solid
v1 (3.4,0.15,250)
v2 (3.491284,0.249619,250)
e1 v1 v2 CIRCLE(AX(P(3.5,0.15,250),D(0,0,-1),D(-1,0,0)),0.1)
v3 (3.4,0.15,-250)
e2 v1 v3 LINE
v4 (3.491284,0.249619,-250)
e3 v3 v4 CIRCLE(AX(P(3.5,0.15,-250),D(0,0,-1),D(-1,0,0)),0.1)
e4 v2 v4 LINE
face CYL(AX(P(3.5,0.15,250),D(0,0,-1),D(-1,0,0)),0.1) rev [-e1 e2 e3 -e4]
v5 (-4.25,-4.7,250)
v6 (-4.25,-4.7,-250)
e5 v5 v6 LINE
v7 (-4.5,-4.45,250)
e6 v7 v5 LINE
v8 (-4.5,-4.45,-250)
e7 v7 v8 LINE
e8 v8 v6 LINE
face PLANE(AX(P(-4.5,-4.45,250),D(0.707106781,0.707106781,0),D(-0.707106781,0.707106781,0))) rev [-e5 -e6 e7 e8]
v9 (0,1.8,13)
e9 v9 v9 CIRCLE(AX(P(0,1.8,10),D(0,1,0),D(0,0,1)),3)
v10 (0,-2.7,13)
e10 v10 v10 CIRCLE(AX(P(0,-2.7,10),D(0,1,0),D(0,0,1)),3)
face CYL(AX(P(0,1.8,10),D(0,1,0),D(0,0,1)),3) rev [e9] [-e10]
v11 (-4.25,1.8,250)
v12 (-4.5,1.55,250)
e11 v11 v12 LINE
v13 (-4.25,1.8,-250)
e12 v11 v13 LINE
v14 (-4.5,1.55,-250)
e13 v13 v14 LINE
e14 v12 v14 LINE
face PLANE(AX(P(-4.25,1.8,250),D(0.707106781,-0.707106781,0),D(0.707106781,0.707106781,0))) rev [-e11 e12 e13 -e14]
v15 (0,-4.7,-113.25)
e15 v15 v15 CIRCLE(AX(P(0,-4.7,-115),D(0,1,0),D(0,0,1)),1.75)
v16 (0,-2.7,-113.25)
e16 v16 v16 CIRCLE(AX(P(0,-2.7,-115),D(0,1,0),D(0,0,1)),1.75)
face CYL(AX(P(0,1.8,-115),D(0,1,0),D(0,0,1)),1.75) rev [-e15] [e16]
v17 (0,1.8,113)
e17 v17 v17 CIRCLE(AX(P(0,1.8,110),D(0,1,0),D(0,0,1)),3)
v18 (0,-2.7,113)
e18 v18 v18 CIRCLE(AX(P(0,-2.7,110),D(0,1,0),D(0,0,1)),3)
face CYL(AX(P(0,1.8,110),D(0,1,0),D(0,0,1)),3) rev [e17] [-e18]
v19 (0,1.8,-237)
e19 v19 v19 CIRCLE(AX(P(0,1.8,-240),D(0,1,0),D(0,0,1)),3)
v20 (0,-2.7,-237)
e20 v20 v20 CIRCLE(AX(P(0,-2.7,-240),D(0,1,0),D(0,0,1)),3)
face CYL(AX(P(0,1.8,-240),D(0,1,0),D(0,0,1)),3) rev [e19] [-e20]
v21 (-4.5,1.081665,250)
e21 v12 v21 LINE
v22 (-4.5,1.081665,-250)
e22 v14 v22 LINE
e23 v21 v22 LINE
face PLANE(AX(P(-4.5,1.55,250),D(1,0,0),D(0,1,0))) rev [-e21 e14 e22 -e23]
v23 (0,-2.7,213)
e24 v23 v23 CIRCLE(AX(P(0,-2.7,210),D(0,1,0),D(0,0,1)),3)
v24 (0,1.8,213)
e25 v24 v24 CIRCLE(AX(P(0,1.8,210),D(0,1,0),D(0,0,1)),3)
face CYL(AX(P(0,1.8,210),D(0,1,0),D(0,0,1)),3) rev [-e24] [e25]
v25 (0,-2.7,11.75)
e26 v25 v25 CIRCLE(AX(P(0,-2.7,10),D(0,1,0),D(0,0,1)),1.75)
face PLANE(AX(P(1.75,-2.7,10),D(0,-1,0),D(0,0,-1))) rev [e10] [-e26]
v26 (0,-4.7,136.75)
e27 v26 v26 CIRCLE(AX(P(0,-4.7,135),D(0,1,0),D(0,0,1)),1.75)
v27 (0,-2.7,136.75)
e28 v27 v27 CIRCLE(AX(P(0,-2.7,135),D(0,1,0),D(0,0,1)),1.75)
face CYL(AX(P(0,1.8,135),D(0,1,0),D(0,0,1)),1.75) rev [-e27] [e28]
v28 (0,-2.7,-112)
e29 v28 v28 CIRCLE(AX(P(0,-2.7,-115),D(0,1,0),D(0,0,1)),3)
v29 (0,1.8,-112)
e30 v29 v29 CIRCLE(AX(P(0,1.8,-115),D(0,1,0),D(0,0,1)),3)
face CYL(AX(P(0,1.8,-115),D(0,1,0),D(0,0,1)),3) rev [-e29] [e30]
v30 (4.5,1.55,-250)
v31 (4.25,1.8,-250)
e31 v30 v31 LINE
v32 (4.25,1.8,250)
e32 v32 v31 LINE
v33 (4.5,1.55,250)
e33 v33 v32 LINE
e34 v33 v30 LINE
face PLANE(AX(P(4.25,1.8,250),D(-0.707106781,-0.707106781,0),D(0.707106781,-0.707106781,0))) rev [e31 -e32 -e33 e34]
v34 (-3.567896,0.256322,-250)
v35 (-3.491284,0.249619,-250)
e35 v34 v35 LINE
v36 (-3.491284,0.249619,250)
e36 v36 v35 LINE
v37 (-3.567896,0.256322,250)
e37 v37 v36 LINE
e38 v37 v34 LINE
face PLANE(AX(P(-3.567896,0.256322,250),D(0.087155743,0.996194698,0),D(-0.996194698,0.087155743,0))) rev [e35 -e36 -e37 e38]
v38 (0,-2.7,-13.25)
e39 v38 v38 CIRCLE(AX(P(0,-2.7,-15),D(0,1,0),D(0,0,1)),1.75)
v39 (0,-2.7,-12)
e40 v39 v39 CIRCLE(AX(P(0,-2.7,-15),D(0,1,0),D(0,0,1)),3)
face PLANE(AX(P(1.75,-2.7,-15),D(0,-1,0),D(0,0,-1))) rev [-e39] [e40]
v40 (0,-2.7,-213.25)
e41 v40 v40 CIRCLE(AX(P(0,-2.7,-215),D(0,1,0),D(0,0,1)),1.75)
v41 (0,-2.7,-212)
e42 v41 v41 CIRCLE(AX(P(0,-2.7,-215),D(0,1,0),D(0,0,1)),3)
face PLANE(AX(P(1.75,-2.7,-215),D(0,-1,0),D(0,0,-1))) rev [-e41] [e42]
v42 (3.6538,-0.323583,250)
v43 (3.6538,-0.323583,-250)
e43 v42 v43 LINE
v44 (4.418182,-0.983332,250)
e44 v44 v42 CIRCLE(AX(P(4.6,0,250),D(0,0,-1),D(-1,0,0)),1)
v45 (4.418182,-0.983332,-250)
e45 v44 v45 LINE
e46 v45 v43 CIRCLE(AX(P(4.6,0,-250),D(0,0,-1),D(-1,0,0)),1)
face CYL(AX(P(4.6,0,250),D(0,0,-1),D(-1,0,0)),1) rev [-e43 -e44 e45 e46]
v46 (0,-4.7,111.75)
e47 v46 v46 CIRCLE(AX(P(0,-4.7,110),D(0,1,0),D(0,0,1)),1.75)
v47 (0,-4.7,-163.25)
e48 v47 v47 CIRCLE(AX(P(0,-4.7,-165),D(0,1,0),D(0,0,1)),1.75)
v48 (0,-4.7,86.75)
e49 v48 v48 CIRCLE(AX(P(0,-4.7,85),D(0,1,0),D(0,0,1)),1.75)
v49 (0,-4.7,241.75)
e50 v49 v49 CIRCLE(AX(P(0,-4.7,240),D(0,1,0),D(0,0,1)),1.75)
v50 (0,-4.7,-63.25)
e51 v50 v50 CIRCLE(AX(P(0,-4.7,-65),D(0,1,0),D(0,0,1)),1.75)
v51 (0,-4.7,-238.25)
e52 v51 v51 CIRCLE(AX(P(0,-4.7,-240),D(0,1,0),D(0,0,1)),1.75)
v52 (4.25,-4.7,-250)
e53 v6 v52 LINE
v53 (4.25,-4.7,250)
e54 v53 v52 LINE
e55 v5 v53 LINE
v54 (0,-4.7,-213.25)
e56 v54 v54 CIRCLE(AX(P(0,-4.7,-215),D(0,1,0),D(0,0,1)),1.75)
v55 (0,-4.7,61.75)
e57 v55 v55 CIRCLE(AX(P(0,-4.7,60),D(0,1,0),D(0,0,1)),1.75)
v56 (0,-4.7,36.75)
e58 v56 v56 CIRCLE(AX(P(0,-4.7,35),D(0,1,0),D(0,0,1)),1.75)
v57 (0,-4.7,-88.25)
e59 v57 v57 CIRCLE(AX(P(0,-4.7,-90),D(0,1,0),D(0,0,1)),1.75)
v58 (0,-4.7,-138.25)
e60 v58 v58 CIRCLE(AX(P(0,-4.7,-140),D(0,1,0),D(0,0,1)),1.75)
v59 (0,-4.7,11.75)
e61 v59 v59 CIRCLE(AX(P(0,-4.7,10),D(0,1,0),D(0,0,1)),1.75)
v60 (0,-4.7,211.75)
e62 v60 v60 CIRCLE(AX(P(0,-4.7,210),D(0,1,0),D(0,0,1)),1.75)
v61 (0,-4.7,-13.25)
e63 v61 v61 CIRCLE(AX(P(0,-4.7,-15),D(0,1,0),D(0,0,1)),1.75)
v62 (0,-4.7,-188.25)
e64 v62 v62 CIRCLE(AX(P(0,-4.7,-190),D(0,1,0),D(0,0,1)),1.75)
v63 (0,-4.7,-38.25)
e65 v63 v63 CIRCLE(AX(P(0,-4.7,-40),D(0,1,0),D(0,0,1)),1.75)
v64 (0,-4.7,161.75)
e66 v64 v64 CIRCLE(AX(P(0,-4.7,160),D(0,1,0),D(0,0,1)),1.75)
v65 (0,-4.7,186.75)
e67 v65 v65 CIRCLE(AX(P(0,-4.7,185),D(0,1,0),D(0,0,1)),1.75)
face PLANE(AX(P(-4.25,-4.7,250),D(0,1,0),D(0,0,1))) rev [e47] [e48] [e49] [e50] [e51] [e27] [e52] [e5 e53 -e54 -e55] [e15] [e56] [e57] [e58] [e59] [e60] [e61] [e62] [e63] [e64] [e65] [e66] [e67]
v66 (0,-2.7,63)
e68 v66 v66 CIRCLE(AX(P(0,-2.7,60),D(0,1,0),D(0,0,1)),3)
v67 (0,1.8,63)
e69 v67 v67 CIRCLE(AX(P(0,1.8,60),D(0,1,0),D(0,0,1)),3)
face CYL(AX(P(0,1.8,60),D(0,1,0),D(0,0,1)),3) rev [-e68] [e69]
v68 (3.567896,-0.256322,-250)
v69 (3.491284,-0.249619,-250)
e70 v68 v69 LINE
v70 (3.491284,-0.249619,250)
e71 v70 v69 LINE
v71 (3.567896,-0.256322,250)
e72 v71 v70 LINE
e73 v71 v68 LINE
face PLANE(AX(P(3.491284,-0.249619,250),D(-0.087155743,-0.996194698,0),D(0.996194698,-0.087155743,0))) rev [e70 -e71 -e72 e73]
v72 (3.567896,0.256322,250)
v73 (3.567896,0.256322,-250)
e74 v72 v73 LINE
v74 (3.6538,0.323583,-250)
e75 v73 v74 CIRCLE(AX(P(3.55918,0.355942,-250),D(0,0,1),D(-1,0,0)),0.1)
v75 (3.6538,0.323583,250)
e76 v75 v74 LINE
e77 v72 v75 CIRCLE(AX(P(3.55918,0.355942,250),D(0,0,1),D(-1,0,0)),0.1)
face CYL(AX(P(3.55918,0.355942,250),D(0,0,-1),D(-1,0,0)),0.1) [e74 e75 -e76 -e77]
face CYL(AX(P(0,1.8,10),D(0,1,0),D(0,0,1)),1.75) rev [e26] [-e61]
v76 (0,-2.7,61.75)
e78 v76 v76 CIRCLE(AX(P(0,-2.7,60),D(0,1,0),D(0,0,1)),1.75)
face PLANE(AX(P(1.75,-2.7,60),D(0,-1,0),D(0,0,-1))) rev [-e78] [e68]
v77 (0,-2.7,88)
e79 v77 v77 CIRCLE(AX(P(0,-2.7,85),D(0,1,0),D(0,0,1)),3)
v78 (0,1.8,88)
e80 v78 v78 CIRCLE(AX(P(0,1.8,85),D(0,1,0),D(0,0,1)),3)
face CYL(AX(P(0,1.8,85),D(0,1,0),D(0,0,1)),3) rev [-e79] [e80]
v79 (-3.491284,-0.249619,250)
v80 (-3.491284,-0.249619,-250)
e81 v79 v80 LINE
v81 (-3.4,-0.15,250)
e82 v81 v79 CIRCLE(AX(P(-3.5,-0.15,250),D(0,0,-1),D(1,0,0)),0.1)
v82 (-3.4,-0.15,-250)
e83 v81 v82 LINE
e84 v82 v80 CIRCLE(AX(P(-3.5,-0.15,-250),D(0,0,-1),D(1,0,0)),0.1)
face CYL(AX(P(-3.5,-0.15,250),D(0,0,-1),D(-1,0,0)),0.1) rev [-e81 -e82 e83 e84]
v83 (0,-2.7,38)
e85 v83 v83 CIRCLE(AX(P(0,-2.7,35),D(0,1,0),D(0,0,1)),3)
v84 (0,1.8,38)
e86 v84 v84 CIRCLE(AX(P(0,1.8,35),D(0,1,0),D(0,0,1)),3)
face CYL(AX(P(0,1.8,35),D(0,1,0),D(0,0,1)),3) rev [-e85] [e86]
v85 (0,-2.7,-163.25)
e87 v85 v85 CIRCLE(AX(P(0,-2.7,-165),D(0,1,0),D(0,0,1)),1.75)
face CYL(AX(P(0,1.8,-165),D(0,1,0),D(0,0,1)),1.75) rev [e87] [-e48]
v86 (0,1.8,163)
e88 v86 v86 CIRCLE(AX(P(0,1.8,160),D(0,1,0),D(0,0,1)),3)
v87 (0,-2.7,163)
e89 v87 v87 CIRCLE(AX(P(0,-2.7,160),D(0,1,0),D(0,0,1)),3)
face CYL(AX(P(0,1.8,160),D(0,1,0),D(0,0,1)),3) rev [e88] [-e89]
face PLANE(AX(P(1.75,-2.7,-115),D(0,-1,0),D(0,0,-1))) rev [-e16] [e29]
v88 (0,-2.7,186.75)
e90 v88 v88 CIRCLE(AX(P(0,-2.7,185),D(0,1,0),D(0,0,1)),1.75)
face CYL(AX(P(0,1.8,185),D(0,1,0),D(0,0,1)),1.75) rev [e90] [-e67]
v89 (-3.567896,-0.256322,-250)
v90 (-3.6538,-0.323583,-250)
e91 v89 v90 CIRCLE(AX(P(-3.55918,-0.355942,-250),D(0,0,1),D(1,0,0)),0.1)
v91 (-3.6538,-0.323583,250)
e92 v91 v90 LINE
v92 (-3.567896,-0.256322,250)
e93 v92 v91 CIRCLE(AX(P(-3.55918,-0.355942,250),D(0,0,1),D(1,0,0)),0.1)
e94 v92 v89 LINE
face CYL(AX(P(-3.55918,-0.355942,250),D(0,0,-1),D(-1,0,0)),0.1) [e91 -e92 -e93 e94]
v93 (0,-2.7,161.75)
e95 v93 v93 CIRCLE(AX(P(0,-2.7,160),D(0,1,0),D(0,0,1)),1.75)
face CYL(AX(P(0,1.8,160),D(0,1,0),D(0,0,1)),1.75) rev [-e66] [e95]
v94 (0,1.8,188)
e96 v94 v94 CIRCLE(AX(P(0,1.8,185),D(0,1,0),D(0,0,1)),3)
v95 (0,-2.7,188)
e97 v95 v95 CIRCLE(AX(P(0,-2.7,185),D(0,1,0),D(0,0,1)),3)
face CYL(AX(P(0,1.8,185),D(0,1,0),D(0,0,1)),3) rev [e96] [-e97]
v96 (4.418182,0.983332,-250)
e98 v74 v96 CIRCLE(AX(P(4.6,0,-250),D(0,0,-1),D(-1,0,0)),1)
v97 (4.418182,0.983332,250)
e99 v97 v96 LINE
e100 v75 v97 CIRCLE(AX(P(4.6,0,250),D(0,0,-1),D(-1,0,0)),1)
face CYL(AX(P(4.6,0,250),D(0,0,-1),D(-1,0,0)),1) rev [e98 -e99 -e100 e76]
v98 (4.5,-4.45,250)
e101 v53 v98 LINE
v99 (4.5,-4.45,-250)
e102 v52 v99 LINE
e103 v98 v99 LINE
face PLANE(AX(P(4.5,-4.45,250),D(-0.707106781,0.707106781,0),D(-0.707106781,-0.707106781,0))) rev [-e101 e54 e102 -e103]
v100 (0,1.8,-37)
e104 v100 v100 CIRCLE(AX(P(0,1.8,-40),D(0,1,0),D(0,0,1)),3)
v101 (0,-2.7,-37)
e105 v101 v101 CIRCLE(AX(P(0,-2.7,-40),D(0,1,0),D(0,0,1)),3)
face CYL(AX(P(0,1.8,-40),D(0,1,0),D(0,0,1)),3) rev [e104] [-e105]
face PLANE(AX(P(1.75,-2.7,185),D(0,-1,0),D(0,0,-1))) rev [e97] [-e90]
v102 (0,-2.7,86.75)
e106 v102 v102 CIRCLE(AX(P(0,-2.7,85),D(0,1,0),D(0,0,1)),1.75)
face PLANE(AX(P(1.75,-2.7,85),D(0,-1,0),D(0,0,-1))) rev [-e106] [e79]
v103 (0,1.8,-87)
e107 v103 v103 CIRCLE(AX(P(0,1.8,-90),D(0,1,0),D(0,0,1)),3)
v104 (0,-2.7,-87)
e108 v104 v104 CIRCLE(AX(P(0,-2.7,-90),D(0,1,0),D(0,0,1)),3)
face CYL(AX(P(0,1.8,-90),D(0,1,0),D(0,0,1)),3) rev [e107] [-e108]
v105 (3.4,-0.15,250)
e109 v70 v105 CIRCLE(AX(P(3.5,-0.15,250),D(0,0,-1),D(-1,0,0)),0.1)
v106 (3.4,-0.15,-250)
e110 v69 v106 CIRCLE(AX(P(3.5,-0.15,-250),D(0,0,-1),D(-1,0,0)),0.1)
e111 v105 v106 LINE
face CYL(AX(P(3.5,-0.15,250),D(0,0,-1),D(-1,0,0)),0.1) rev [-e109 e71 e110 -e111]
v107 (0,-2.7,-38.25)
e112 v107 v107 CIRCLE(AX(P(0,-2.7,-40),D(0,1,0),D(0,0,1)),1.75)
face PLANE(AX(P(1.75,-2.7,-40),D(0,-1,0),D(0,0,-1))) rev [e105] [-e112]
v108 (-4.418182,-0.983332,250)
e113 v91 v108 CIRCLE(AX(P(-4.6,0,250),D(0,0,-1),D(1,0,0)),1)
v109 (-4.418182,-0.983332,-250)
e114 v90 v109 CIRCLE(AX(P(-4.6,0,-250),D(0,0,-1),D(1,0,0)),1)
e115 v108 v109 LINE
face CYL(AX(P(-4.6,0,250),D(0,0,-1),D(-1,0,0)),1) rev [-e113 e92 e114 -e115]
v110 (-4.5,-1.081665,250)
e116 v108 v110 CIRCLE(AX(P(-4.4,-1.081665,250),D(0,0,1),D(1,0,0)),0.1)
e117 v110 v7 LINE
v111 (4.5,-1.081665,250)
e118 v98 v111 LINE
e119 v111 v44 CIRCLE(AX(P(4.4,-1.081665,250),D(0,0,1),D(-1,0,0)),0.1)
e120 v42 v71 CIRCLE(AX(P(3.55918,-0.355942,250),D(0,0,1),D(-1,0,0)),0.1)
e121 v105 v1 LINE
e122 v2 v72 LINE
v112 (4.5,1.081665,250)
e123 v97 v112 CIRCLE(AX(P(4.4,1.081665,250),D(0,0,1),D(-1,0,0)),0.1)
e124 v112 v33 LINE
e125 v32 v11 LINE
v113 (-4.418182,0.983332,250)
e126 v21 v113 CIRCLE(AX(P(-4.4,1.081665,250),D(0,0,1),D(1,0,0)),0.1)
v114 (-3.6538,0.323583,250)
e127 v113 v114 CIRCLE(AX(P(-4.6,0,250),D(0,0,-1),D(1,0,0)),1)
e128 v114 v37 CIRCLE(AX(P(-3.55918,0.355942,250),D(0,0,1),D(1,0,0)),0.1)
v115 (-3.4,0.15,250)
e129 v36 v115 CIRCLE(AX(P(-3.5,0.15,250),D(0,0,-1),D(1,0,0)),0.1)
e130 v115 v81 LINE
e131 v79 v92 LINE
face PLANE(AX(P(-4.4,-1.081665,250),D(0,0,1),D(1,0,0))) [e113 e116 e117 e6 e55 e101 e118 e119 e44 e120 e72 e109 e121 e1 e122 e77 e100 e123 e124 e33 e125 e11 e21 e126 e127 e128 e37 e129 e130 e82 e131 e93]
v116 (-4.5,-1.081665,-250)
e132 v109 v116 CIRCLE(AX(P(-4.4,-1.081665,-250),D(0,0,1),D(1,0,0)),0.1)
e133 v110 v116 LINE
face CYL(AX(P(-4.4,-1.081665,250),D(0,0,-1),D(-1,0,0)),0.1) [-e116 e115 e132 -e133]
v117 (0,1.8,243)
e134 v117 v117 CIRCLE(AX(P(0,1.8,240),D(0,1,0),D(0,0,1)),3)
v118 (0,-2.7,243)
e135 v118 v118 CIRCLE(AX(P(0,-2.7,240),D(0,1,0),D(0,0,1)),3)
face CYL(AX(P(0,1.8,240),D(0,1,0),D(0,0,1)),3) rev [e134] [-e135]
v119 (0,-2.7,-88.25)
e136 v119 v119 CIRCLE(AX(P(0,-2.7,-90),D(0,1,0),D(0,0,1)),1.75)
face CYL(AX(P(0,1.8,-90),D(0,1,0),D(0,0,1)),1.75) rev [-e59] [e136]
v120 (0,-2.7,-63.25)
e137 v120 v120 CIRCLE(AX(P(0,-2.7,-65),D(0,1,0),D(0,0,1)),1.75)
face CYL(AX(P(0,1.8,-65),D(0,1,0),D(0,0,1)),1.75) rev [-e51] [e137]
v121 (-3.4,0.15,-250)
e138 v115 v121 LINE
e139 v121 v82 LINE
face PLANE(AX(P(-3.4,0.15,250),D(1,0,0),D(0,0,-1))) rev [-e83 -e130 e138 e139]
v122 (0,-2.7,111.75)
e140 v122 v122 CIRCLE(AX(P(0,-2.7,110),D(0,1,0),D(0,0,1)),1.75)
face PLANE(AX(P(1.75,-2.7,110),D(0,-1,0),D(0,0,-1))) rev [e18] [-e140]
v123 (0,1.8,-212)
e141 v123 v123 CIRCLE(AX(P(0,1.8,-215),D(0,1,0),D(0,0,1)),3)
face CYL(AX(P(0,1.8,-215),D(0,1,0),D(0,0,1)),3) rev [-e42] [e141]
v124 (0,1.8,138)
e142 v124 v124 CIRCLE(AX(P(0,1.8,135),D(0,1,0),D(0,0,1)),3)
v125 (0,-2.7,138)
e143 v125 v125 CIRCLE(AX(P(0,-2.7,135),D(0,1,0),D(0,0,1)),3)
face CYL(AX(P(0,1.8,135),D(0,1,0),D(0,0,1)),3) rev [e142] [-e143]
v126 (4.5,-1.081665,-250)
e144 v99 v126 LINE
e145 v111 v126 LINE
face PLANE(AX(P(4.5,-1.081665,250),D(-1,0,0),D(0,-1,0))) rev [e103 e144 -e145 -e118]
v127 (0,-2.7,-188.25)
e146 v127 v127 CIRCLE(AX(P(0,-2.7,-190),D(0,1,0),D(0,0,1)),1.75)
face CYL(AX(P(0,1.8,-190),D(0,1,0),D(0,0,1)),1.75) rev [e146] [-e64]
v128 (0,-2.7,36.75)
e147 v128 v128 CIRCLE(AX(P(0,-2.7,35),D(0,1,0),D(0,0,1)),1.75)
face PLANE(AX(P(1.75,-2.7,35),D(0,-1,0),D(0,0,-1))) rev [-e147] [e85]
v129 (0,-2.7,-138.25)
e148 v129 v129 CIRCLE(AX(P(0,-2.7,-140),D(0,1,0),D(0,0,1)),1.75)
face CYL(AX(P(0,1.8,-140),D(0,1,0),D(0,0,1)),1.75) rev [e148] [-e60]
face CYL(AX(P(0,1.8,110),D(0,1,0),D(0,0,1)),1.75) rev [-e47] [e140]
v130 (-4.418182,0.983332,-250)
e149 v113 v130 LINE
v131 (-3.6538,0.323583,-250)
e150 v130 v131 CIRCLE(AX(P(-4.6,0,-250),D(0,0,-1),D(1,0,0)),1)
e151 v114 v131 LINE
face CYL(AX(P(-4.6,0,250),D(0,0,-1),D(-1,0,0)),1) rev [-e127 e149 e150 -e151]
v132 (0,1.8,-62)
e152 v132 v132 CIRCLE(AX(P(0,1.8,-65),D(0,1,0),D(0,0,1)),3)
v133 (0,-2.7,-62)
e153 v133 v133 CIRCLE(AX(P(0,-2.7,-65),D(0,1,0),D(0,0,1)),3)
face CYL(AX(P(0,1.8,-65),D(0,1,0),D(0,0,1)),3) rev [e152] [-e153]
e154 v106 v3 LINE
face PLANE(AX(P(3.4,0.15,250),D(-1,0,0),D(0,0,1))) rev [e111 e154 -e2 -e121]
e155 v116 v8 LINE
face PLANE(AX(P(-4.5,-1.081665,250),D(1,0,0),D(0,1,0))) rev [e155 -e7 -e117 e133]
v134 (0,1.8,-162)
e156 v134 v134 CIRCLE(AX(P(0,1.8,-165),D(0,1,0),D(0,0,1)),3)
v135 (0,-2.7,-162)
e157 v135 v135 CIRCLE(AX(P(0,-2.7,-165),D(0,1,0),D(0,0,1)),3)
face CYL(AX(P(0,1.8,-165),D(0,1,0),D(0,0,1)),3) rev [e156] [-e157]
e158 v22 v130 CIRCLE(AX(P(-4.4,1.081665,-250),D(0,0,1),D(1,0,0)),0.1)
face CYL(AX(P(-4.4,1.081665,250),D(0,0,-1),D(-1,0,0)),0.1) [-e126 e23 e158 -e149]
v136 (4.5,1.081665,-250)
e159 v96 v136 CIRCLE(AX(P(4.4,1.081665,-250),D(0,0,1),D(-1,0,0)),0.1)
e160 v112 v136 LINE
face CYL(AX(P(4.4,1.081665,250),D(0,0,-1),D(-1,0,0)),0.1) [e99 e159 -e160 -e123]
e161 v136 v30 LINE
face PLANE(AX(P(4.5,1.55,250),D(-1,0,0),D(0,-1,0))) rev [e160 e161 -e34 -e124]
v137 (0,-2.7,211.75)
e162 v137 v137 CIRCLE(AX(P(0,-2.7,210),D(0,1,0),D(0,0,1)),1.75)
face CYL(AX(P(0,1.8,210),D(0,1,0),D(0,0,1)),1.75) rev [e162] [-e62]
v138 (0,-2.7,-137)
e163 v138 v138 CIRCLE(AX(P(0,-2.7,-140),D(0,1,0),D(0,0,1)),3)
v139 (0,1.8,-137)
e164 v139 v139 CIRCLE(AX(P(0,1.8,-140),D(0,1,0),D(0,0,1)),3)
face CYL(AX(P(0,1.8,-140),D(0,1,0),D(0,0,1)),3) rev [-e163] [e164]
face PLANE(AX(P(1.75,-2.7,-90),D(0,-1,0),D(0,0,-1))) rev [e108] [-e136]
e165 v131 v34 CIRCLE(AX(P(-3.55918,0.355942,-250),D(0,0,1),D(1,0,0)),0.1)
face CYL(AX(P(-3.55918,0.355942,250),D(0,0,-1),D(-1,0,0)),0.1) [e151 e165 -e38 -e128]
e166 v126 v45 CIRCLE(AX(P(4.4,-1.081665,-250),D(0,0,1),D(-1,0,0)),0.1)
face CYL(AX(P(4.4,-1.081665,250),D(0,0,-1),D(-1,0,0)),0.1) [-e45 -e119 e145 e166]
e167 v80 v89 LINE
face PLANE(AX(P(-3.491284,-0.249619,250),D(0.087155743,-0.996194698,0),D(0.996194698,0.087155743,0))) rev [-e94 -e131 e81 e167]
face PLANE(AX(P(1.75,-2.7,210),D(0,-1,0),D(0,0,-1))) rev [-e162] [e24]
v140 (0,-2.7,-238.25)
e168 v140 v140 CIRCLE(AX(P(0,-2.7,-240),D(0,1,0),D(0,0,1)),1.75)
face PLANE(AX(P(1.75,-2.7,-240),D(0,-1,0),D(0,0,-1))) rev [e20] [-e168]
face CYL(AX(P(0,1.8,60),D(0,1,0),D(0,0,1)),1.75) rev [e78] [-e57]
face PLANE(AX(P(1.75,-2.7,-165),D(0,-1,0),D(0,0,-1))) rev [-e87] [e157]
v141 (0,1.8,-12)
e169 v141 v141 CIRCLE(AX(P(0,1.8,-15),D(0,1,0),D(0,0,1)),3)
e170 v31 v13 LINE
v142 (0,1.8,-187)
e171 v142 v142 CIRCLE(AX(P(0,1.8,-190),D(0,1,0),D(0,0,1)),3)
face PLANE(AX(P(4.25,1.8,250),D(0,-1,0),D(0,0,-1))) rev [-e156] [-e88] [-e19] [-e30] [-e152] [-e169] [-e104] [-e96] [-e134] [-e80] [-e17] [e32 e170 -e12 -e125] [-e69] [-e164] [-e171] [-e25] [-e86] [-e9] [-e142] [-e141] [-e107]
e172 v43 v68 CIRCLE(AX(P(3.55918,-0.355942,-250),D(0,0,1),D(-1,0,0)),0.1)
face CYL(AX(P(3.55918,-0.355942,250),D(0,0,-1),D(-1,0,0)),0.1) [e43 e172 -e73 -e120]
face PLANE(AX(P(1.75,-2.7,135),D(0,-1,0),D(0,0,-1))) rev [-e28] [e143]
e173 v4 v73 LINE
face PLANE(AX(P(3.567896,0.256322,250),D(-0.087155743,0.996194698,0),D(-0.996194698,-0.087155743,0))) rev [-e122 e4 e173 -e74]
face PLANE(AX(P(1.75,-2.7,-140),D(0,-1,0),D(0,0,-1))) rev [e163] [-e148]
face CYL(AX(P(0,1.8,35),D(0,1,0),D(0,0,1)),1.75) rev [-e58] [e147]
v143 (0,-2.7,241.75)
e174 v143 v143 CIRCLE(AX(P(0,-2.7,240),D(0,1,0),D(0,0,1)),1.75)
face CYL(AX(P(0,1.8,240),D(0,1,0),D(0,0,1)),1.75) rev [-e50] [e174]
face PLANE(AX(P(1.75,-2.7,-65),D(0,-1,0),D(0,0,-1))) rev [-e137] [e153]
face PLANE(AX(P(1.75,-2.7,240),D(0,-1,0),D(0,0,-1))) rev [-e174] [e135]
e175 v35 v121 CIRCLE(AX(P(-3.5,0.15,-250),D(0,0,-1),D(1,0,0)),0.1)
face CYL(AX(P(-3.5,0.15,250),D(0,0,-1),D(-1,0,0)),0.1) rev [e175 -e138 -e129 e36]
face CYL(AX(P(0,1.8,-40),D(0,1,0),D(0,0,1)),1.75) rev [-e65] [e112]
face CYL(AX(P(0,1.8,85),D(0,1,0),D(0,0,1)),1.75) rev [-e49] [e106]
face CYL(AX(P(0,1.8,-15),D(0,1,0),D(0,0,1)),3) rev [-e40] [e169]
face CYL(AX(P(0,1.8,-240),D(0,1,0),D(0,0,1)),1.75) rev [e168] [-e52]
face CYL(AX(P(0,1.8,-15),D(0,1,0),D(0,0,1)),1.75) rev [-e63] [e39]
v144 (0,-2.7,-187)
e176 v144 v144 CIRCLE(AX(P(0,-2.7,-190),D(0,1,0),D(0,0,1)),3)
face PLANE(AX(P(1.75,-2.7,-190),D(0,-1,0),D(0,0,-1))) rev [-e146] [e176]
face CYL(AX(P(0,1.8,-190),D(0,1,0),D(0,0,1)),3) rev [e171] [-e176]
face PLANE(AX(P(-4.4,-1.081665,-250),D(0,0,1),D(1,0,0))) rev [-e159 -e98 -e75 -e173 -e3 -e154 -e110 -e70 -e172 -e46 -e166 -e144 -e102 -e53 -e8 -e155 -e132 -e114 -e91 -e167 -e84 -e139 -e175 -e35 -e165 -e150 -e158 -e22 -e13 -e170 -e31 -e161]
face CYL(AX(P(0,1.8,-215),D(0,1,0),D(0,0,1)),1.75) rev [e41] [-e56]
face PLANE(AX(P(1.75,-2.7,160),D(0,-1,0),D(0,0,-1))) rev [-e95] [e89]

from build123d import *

# Parameters (mm, degrees)
RAIL_PROFILE_DEPTH             = 250
CBORE_FOR_M3_SHCS1_D           = 3.5
CBORE_FOR_M3_SHCS1_CBORE_D     = 6
CBORE_FOR_M3_SHCS1_CBORE_DEPTH = 4.5
FILL_START                     = -2.7
FILL_PATTERN1_OUTLINE_R        = 3
FILL_PATTERN1_DEPTH            = 4.5
FILL_START_2                   = -4.7
FILL_PATTERN1_2_OUTLINE_R      = 1.75
FILL_PATTERN1_2_DEPTH          = 2


# Read off the part's stored shape, not the designer's step: Fill Pattern1
with BuildPart() as part:
    # Sketch1 → RAIL PROFILE (new, symmetric)
    with BuildSketch(Plane.XY):
        with BuildLine():
            Line((-4.5, -1.081665383), (-4.5, -4.45))
            Line((-4.5, -4.45), (-4.25, -4.7))
            Line((-4.25, -4.7), (4.25, -4.7))
            Line((4.25, -4.7), (4.5, -4.45))
            Line((4.5, -4.45), (4.5, -1.081665383))
            ThreePointArc((4.5, -1.081665383), (4.476870611, -1.017705168), (4.418181818, -0.983332166))
            ThreePointArc((4.418181818, -0.983332166), (3.946606362, -0.757018331), (3.653800296, -0.32358325))
            ThreePointArc((3.653800296, -0.32358325), (3.620829122, -0.277205142), (3.5678959, -0.256322105))
            Line((3.5678959, -0.256322105), (3.491284426, -0.24961947))
            ThreePointArc((3.491284426, -0.24961947), (3.426272266, -0.217559021), (3.4, -0.15))
            Line((3.4, -0.15), (3.4, 0.15))
            ThreePointArc((3.4, 0.15), (3.426272266, 0.217559021), (3.491284426, 0.24961947))
            Line((3.491284426, 0.24961947), (3.5678959, 0.256322105))
            ThreePointArc((3.5678959, 0.256322105), (3.620829122, 0.277205142), (3.653800296, 0.32358325))
            ThreePointArc((3.653800296, 0.32358325), (3.946606362, 0.757018331), (4.418181818, 0.983332166))
            ThreePointArc((4.418181818, 0.983332166), (4.476870611, 1.017705168), (4.5, 1.081665383))
            Line((4.5, 1.081665383), (4.5, 1.55))
            Line((4.5, 1.55), (4.25, 1.8))
            Line((4.25, 1.8), (-4.25, 1.8))
            Line((-4.25, 1.8), (-4.5, 1.55))
            Line((-4.5, 1.55), (-4.5, 1.081665383))
            ThreePointArc((-4.5, 1.081665383), (-4.476870611, 1.017705168), (-4.418181818, 0.983332166))
            ThreePointArc((-4.418181818, 0.983332166), (-3.946606362, 0.757018331), (-3.653800296, 0.32358325))
            ThreePointArc((-3.653800296, 0.32358325), (-3.620829122, 0.277205142), (-3.5678959, 0.256322105))
            Line((-3.5678959, 0.256322105), (-3.491284426, 0.24961947))
            ThreePointArc((-3.491284426, 0.24961947), (-3.426272266, 0.217559021), (-3.4, 0.15))
            Line((-3.4, 0.15), (-3.4, -0.15))
            ThreePointArc((-3.4, -0.15), (-3.426272266, -0.217559021), (-3.491284426, -0.24961947))
            Line((-3.491284426, -0.24961947), (-3.5678959, -0.256322105))
            ThreePointArc((-3.5678959, -0.256322105), (-3.620829122, -0.277205142), (-3.653800296, -0.32358325))
            ThreePointArc((-3.653800296, -0.32358325), (-3.946606362, -0.757018331), (-4.418181818, -0.983332166))
            ThreePointArc((-4.418181818, -0.983332166), (-4.476870611, -1.017705168), (-4.5, -1.081665383))
        make_face()
    extrude(amount=RAIL_PROFILE_DEPTH, both=True)

    # CBORE for M3 SHCS1 (through all)
    with Locations(Plane(origin=(0, 1.8, 0), x_dir=(1, 0, 0), z_dir=(0, 1, 0))):
        with Locations((0, 240)):
            cbore_for_m3_shcs1 = CounterBoreHole(CBORE_FOR_M3_SHCS1_D / 2, CBORE_FOR_M3_SHCS1_CBORE_D / 2, CBORE_FOR_M3_SHCS1_CBORE_DEPTH)

    # M3 END MIRROR: CBORE for M3 SHCS1 across plane
    add(cbore_for_m3_shcs1.mirror(Plane.XY), mode=Mode.SUBTRACT)

    # Fill Pattern1 outline → Fill Pattern1 (cut)
    with BuildSketch(Plane(origin=(0, 0, 0), x_dir=(1, 0, 0), z_dir=(0, 1, 0)).offset(FILL_START)):
        with Locations((0, 215)):
            Circle(FILL_PATTERN1_OUTLINE_R)
        with Locations((0, 190)):
            Circle(FILL_PATTERN1_OUTLINE_R)
        with Locations((0, 165)):
            Circle(FILL_PATTERN1_OUTLINE_R)
        with Locations((0, 140)):
            Circle(FILL_PATTERN1_OUTLINE_R)
        with Locations((0, 115)):
            Circle(FILL_PATTERN1_OUTLINE_R)
        with Locations((0, 90)):
            Circle(FILL_PATTERN1_OUTLINE_R)
        with Locations((0, 65)):
            Circle(FILL_PATTERN1_OUTLINE_R)
        with Locations((0, 40)):
            Circle(FILL_PATTERN1_OUTLINE_R)
        with Locations((0, 15)):
            Circle(FILL_PATTERN1_OUTLINE_R)
        with Locations((0, -10)):
            Circle(FILL_PATTERN1_OUTLINE_R)
        with Locations((0, -35)):
            Circle(FILL_PATTERN1_OUTLINE_R)
        with Locations((0, -60)):
            Circle(FILL_PATTERN1_OUTLINE_R)
        with Locations((0, -85)):
            Circle(FILL_PATTERN1_OUTLINE_R)
        with Locations((0, -110)):
            Circle(FILL_PATTERN1_OUTLINE_R)
        with Locations((0, -135)):
            Circle(FILL_PATTERN1_OUTLINE_R)
        with Locations((0, -160)):
            Circle(FILL_PATTERN1_OUTLINE_R)
        with Locations((0, -185)):
            Circle(FILL_PATTERN1_OUTLINE_R)
        with Locations((0, -210)):
            Circle(FILL_PATTERN1_OUTLINE_R)
    extrude(amount=FILL_PATTERN1_DEPTH, mode=Mode.SUBTRACT)

    # Fill Pattern1 2 outline → Fill Pattern1 2 (cut)
    with BuildSketch(Plane(origin=(0, 0, 0), x_dir=(1, 0, 0), z_dir=(0, 1, 0)).offset(FILL_START_2)):
        with Locations((0, 215)):
            Circle(FILL_PATTERN1_2_OUTLINE_R)
        with Locations((0, 190)):
            Circle(FILL_PATTERN1_2_OUTLINE_R)
        with Locations((0, 165)):
            Circle(FILL_PATTERN1_2_OUTLINE_R)
        with Locations((0, 140)):
            Circle(FILL_PATTERN1_2_OUTLINE_R)
        with Locations((0, 115)):
            Circle(FILL_PATTERN1_2_OUTLINE_R)
        with Locations((0, 90)):
            Circle(FILL_PATTERN1_2_OUTLINE_R)
        with Locations((0, 65)):
            Circle(FILL_PATTERN1_2_OUTLINE_R)
        with Locations((0, 40)):
            Circle(FILL_PATTERN1_2_OUTLINE_R)
        with Locations((0, 15)):
            Circle(FILL_PATTERN1_2_OUTLINE_R)
        with Locations((0, -10)):
            Circle(FILL_PATTERN1_2_OUTLINE_R)
        with Locations((0, -35)):
            Circle(FILL_PATTERN1_2_OUTLINE_R)
        with Locations((0, -60)):
            Circle(FILL_PATTERN1_2_OUTLINE_R)
        with Locations((0, -85)):
            Circle(FILL_PATTERN1_2_OUTLINE_R)
        with Locations((0, -110)):
            Circle(FILL_PATTERN1_2_OUTLINE_R)
        with Locations((0, -135)):
            Circle(FILL_PATTERN1_2_OUTLINE_R)
        with Locations((0, -160)):
            Circle(FILL_PATTERN1_2_OUTLINE_R)
        with Locations((0, -185)):
            Circle(FILL_PATTERN1_2_OUTLINE_R)
        with Locations((0, -210)):
            Circle(FILL_PATTERN1_2_OUTLINE_R)
    extrude(amount=FILL_PATTERN1_2_DEPTH, mode=Mode.SUBTRACT)


solid = part.part
